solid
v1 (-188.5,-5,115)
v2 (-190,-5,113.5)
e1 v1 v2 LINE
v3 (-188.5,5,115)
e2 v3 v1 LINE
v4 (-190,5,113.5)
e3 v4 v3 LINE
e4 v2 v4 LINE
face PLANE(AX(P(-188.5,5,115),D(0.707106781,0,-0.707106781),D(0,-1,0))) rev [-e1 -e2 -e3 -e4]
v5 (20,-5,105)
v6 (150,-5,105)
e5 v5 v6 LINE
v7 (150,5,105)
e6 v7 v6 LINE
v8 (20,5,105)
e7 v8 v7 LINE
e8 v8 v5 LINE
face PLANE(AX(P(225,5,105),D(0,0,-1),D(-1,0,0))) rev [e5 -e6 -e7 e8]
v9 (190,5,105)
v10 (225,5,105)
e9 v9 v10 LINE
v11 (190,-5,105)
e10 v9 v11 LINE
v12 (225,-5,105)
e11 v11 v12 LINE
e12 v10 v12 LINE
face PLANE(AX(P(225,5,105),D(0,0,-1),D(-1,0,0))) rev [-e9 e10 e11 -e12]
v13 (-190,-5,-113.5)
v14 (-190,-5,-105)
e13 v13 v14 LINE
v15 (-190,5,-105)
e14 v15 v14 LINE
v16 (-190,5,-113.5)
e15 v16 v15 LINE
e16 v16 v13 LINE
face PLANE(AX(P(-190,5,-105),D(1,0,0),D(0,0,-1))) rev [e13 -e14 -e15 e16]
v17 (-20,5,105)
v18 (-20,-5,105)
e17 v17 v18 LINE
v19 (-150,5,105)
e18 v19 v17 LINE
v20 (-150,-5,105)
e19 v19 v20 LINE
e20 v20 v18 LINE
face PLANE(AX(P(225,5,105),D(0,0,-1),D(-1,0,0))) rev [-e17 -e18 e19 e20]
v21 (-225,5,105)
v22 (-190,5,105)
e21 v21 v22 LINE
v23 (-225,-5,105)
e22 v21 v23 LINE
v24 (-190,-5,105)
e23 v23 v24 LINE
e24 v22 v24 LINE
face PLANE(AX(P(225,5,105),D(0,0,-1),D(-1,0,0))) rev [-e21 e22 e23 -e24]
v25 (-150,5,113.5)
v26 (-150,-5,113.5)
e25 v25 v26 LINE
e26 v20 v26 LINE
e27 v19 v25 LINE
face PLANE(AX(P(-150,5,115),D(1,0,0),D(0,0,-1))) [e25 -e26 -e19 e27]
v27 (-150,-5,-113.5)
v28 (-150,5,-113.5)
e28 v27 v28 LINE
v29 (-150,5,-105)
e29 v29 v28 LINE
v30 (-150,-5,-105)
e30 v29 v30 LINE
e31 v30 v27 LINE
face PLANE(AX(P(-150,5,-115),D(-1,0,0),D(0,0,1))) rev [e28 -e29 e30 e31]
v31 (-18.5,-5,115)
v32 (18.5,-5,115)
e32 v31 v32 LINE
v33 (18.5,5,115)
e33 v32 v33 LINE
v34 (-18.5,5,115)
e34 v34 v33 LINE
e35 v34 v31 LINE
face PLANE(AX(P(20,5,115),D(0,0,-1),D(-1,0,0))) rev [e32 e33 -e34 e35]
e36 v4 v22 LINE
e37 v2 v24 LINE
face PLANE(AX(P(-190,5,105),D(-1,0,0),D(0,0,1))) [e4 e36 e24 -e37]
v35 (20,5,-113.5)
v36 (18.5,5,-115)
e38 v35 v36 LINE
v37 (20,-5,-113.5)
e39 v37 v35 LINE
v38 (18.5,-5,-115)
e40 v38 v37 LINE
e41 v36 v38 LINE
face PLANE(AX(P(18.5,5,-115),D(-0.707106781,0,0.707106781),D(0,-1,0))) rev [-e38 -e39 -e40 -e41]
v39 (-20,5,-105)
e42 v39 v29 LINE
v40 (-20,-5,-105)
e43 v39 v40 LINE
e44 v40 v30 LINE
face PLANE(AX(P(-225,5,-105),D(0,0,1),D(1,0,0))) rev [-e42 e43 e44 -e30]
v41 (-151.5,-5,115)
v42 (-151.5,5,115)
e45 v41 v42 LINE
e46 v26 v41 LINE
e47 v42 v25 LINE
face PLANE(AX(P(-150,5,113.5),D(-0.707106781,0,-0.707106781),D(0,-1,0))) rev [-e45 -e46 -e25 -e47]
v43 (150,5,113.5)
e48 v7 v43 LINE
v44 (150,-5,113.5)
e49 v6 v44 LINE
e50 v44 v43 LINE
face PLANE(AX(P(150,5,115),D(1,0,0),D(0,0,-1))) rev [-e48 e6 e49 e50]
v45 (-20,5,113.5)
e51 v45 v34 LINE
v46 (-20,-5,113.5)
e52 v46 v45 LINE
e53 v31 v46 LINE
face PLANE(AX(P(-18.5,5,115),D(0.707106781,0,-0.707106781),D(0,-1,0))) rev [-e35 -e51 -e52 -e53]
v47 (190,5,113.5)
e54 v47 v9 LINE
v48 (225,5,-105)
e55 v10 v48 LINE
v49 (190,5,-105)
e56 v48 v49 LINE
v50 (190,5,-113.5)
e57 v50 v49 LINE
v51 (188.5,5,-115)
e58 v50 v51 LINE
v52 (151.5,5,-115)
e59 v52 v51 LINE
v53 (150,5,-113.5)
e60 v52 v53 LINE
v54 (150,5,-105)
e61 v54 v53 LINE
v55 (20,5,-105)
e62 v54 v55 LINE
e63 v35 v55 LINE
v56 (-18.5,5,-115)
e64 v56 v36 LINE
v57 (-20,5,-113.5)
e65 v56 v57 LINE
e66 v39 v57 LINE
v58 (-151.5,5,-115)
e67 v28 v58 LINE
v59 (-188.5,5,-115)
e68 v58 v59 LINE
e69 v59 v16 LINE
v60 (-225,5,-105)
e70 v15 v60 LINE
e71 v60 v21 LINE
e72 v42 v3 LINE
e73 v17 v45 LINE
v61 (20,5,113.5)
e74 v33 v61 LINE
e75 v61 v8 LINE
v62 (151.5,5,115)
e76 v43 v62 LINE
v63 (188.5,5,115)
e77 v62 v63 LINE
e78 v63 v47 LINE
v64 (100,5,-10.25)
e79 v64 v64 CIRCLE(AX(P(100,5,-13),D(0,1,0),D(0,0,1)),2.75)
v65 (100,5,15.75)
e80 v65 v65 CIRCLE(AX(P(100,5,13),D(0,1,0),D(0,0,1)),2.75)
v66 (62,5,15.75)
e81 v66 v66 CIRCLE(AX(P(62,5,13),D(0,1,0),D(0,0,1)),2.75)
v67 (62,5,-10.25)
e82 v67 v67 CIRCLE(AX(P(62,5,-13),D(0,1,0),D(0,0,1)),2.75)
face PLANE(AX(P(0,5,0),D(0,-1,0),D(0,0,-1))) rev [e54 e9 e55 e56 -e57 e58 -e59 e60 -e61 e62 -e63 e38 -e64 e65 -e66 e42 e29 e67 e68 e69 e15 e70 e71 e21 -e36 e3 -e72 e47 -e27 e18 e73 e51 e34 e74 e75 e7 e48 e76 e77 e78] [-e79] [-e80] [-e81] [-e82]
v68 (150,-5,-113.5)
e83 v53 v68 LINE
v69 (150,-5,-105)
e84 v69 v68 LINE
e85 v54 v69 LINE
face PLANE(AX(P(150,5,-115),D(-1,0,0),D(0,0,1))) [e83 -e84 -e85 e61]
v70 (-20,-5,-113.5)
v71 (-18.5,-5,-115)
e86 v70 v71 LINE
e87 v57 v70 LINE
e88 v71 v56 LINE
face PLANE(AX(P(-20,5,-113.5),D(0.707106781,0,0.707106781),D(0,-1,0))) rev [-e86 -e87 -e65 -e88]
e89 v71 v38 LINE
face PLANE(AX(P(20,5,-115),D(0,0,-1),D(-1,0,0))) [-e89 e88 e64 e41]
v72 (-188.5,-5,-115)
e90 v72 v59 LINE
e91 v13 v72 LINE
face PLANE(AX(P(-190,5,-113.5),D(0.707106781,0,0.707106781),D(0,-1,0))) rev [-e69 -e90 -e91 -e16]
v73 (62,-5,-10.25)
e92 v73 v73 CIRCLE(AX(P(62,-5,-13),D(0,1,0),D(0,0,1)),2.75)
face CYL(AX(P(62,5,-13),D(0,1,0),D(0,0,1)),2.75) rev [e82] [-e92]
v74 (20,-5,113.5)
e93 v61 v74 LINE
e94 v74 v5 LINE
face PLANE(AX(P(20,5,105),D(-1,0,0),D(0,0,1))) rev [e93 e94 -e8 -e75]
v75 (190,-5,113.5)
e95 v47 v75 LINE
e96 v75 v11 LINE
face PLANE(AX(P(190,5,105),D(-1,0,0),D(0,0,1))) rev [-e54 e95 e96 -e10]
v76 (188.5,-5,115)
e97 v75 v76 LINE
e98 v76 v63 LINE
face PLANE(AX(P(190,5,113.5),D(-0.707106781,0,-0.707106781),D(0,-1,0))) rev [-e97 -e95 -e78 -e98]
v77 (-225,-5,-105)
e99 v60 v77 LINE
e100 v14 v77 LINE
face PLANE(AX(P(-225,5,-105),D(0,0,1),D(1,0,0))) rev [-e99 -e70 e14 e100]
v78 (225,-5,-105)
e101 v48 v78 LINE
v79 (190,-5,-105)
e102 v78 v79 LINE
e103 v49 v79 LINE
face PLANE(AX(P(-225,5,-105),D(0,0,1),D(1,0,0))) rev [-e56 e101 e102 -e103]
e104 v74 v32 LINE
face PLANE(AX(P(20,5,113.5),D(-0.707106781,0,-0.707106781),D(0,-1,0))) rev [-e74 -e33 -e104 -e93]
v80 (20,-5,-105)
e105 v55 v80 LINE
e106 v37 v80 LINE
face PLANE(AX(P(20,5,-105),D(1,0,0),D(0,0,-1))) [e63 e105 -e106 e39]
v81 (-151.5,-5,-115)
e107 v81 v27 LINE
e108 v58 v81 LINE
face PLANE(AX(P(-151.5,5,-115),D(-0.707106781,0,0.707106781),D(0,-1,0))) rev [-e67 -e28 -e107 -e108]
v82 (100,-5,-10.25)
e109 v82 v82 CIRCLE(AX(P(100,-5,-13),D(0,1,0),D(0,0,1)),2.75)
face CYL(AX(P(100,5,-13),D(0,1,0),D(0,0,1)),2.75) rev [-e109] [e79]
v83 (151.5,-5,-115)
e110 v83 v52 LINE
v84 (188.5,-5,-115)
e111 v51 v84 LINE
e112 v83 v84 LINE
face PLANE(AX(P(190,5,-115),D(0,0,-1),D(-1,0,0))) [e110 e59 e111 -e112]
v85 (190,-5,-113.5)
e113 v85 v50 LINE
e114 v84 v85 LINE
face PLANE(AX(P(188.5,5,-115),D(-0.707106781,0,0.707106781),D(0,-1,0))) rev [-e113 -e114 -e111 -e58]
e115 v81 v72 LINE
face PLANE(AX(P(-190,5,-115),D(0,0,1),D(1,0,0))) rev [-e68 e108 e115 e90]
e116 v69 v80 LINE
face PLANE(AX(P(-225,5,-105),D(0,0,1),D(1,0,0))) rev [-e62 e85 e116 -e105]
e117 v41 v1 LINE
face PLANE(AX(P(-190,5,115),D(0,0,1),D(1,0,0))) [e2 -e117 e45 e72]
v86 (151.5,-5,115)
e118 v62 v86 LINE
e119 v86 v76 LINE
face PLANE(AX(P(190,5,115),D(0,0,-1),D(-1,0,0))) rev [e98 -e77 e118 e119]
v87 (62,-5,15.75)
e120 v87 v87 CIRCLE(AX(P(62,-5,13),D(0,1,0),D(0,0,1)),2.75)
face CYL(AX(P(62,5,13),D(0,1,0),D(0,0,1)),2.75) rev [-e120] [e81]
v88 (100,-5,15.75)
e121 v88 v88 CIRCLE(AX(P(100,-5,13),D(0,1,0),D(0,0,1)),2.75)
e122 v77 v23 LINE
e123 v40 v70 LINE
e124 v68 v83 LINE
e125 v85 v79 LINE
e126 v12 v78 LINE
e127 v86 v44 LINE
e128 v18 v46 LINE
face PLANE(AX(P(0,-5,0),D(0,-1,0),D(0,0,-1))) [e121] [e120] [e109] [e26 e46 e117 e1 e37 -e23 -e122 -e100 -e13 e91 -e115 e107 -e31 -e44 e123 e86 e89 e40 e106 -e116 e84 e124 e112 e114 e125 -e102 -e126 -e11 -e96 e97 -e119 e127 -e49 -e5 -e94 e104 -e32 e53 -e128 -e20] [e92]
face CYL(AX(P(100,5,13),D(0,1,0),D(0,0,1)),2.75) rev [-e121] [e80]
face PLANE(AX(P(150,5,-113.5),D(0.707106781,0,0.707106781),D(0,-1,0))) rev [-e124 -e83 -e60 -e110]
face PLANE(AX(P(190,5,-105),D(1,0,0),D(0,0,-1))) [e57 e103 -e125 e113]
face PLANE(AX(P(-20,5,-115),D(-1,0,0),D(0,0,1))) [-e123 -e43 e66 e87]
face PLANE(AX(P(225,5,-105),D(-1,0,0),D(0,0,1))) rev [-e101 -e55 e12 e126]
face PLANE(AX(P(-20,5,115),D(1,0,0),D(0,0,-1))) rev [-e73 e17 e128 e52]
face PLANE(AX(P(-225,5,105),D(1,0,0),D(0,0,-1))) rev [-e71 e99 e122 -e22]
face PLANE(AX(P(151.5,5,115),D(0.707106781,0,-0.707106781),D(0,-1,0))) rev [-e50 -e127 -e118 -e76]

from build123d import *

# Parameters (mm, degrees)
SKETCH_1_W                       = 450
SKETCH_1_H                       = 210
EXTRUDE_797_DEPTH                = 5
SKETCH_2_W                       = 40
SKETCH_2_H                       = 10
EXTRUDE_849_DEPTH                = 5
CHAMFER_897_SIZE                 = 1.5
SKETCH_3_W                       = 40
SKETCH_3_H                       = 10
EXTRUDE_968_DEPTH                = 5
CHAMFER_1013_SIZE                = 1.5
CHAMFER_1013_OF_MIRROR_1076_SIZE = 1.5
MIRROR_START                     = -5
MIRROR_1098_DEPTH                = 10
HOLE_WIZARD_1123_D               = 5.5
HOLE_WIZARD_1123_DEPTH           = 10
HOLE_WIZARD_1123_TIP             = 1.652366702


# Read off the part's stored shape, not the designer's step: ほぞ(左)
with BuildPart() as part:
    # ｽｹｯﾁ1 → Extrude 797 (new, symmetric)
    with BuildSketch(Plane(origin=(0, 0, 0), x_dir=(1, 0, 0), z_dir=(0, 1, 0))):
        Rectangle(SKETCH_1_W, SKETCH_1_H)
    extrude(amount=EXTRUDE_797_DEPTH, both=True)

    # ｽｹｯﾁ2 → Extrude 849 (add, symmetric)
    with BuildSketch(Plane(origin=(0, 0, 0), x_dir=(1, 0, 0), z_dir=(0, 1, 0))):
        with Locations((0, -110)):
            Rectangle(SKETCH_2_W, SKETCH_2_H)
    extrude(amount=EXTRUDE_849_DEPTH, both=True)

    # Chamfer 897
    chamfer_897_edges = [part.edges().sort_by_distance(p)[0] for p in [
        (-20, 0, 115),
        (20, 0, 115),
    ]]
    chamfer(chamfer_897_edges, length=CHAMFER_897_SIZE)

    # ｽｹｯﾁ3 → Extrude 968 (add, symmetric)
    with BuildSketch(Plane(origin=(0, 0, 0), x_dir=(1, 0, 0), z_dir=(0, 1, 0))):
        with Locations((170, -110)):
            Rectangle(SKETCH_3_W, SKETCH_3_H)
    extrude_968 = extrude(amount=EXTRUDE_968_DEPTH, both=True)

    # Chamfer 1013
    chamfer_1013_edges = [part.edges().sort_by_distance(p)[0] for p in [
        (150, 0, 115),
        (190, 0, 115),
    ]]
    chamfer(chamfer_1013_edges, length=CHAMFER_1013_SIZE)

    # Mirror 1076: Extrude 968 across plane
    add(extrude_968.mirror(Plane(origin=(0, 0, 0), x_dir=(0, 0, 1), z_dir=(1, 0, 0))))

    # Chamfer 1013 of Mirror 1076
    chamfer_1013_of_mirror_1076_edges = [part.edges().sort_by_distance(p)[0] for p in [
        (-150, 0, 115),
        (-190, 0, 115),
    ]]
    chamfer(chamfer_1013_of_mirror_1076_edges, length=CHAMFER_1013_OF_MIRROR_1076_SIZE)

    # Mirror 1098 outline → Mirror 1098 (add)
    with BuildSketch(Plane(origin=(0, 0, 0), x_dir=(1, 0, 0), z_dir=(0, 1, 0)).offset(MIRROR_START)):
        Polygon((-18.5, 115), (-20, 113.5), (-20, 105), (20, 105), (20, 113.5), (18.5, 115), align=None)
        Polygon((150, 113.5), (150, 105), (190, 105), (190, 113.5), (188.5, 115), (151.5, 115), align=None)
        Polygon((-190, 105), (-150, 105), (-150, 113.5), (-151.5, 115), (-188.5, 115), (-190, 113.5), align=None)
    extrude(amount=MIRROR_1098_DEPTH)

    # Hole Wizard 1123
    with Locations(Plane(origin=(0, 5, 0), x_dir=(1, 0, 0), z_dir=(0, 1, 0))):
        with Locations((100, -13), (100, 13), (62, -13), (62, 13)):
            Hole(HOLE_WIZARD_1123_D / 2, depth=HOLE_WIZARD_1123_DEPTH)
            with Locations((0, 0, -(HOLE_WIZARD_1123_DEPTH + HOLE_WIZARD_1123_TIP / 2))):  # 118° drill point
                Cone(0, HOLE_WIZARD_1123_D / 2, HOLE_WIZARD_1123_TIP, mode=Mode.SUBTRACT)


solid = part.part
